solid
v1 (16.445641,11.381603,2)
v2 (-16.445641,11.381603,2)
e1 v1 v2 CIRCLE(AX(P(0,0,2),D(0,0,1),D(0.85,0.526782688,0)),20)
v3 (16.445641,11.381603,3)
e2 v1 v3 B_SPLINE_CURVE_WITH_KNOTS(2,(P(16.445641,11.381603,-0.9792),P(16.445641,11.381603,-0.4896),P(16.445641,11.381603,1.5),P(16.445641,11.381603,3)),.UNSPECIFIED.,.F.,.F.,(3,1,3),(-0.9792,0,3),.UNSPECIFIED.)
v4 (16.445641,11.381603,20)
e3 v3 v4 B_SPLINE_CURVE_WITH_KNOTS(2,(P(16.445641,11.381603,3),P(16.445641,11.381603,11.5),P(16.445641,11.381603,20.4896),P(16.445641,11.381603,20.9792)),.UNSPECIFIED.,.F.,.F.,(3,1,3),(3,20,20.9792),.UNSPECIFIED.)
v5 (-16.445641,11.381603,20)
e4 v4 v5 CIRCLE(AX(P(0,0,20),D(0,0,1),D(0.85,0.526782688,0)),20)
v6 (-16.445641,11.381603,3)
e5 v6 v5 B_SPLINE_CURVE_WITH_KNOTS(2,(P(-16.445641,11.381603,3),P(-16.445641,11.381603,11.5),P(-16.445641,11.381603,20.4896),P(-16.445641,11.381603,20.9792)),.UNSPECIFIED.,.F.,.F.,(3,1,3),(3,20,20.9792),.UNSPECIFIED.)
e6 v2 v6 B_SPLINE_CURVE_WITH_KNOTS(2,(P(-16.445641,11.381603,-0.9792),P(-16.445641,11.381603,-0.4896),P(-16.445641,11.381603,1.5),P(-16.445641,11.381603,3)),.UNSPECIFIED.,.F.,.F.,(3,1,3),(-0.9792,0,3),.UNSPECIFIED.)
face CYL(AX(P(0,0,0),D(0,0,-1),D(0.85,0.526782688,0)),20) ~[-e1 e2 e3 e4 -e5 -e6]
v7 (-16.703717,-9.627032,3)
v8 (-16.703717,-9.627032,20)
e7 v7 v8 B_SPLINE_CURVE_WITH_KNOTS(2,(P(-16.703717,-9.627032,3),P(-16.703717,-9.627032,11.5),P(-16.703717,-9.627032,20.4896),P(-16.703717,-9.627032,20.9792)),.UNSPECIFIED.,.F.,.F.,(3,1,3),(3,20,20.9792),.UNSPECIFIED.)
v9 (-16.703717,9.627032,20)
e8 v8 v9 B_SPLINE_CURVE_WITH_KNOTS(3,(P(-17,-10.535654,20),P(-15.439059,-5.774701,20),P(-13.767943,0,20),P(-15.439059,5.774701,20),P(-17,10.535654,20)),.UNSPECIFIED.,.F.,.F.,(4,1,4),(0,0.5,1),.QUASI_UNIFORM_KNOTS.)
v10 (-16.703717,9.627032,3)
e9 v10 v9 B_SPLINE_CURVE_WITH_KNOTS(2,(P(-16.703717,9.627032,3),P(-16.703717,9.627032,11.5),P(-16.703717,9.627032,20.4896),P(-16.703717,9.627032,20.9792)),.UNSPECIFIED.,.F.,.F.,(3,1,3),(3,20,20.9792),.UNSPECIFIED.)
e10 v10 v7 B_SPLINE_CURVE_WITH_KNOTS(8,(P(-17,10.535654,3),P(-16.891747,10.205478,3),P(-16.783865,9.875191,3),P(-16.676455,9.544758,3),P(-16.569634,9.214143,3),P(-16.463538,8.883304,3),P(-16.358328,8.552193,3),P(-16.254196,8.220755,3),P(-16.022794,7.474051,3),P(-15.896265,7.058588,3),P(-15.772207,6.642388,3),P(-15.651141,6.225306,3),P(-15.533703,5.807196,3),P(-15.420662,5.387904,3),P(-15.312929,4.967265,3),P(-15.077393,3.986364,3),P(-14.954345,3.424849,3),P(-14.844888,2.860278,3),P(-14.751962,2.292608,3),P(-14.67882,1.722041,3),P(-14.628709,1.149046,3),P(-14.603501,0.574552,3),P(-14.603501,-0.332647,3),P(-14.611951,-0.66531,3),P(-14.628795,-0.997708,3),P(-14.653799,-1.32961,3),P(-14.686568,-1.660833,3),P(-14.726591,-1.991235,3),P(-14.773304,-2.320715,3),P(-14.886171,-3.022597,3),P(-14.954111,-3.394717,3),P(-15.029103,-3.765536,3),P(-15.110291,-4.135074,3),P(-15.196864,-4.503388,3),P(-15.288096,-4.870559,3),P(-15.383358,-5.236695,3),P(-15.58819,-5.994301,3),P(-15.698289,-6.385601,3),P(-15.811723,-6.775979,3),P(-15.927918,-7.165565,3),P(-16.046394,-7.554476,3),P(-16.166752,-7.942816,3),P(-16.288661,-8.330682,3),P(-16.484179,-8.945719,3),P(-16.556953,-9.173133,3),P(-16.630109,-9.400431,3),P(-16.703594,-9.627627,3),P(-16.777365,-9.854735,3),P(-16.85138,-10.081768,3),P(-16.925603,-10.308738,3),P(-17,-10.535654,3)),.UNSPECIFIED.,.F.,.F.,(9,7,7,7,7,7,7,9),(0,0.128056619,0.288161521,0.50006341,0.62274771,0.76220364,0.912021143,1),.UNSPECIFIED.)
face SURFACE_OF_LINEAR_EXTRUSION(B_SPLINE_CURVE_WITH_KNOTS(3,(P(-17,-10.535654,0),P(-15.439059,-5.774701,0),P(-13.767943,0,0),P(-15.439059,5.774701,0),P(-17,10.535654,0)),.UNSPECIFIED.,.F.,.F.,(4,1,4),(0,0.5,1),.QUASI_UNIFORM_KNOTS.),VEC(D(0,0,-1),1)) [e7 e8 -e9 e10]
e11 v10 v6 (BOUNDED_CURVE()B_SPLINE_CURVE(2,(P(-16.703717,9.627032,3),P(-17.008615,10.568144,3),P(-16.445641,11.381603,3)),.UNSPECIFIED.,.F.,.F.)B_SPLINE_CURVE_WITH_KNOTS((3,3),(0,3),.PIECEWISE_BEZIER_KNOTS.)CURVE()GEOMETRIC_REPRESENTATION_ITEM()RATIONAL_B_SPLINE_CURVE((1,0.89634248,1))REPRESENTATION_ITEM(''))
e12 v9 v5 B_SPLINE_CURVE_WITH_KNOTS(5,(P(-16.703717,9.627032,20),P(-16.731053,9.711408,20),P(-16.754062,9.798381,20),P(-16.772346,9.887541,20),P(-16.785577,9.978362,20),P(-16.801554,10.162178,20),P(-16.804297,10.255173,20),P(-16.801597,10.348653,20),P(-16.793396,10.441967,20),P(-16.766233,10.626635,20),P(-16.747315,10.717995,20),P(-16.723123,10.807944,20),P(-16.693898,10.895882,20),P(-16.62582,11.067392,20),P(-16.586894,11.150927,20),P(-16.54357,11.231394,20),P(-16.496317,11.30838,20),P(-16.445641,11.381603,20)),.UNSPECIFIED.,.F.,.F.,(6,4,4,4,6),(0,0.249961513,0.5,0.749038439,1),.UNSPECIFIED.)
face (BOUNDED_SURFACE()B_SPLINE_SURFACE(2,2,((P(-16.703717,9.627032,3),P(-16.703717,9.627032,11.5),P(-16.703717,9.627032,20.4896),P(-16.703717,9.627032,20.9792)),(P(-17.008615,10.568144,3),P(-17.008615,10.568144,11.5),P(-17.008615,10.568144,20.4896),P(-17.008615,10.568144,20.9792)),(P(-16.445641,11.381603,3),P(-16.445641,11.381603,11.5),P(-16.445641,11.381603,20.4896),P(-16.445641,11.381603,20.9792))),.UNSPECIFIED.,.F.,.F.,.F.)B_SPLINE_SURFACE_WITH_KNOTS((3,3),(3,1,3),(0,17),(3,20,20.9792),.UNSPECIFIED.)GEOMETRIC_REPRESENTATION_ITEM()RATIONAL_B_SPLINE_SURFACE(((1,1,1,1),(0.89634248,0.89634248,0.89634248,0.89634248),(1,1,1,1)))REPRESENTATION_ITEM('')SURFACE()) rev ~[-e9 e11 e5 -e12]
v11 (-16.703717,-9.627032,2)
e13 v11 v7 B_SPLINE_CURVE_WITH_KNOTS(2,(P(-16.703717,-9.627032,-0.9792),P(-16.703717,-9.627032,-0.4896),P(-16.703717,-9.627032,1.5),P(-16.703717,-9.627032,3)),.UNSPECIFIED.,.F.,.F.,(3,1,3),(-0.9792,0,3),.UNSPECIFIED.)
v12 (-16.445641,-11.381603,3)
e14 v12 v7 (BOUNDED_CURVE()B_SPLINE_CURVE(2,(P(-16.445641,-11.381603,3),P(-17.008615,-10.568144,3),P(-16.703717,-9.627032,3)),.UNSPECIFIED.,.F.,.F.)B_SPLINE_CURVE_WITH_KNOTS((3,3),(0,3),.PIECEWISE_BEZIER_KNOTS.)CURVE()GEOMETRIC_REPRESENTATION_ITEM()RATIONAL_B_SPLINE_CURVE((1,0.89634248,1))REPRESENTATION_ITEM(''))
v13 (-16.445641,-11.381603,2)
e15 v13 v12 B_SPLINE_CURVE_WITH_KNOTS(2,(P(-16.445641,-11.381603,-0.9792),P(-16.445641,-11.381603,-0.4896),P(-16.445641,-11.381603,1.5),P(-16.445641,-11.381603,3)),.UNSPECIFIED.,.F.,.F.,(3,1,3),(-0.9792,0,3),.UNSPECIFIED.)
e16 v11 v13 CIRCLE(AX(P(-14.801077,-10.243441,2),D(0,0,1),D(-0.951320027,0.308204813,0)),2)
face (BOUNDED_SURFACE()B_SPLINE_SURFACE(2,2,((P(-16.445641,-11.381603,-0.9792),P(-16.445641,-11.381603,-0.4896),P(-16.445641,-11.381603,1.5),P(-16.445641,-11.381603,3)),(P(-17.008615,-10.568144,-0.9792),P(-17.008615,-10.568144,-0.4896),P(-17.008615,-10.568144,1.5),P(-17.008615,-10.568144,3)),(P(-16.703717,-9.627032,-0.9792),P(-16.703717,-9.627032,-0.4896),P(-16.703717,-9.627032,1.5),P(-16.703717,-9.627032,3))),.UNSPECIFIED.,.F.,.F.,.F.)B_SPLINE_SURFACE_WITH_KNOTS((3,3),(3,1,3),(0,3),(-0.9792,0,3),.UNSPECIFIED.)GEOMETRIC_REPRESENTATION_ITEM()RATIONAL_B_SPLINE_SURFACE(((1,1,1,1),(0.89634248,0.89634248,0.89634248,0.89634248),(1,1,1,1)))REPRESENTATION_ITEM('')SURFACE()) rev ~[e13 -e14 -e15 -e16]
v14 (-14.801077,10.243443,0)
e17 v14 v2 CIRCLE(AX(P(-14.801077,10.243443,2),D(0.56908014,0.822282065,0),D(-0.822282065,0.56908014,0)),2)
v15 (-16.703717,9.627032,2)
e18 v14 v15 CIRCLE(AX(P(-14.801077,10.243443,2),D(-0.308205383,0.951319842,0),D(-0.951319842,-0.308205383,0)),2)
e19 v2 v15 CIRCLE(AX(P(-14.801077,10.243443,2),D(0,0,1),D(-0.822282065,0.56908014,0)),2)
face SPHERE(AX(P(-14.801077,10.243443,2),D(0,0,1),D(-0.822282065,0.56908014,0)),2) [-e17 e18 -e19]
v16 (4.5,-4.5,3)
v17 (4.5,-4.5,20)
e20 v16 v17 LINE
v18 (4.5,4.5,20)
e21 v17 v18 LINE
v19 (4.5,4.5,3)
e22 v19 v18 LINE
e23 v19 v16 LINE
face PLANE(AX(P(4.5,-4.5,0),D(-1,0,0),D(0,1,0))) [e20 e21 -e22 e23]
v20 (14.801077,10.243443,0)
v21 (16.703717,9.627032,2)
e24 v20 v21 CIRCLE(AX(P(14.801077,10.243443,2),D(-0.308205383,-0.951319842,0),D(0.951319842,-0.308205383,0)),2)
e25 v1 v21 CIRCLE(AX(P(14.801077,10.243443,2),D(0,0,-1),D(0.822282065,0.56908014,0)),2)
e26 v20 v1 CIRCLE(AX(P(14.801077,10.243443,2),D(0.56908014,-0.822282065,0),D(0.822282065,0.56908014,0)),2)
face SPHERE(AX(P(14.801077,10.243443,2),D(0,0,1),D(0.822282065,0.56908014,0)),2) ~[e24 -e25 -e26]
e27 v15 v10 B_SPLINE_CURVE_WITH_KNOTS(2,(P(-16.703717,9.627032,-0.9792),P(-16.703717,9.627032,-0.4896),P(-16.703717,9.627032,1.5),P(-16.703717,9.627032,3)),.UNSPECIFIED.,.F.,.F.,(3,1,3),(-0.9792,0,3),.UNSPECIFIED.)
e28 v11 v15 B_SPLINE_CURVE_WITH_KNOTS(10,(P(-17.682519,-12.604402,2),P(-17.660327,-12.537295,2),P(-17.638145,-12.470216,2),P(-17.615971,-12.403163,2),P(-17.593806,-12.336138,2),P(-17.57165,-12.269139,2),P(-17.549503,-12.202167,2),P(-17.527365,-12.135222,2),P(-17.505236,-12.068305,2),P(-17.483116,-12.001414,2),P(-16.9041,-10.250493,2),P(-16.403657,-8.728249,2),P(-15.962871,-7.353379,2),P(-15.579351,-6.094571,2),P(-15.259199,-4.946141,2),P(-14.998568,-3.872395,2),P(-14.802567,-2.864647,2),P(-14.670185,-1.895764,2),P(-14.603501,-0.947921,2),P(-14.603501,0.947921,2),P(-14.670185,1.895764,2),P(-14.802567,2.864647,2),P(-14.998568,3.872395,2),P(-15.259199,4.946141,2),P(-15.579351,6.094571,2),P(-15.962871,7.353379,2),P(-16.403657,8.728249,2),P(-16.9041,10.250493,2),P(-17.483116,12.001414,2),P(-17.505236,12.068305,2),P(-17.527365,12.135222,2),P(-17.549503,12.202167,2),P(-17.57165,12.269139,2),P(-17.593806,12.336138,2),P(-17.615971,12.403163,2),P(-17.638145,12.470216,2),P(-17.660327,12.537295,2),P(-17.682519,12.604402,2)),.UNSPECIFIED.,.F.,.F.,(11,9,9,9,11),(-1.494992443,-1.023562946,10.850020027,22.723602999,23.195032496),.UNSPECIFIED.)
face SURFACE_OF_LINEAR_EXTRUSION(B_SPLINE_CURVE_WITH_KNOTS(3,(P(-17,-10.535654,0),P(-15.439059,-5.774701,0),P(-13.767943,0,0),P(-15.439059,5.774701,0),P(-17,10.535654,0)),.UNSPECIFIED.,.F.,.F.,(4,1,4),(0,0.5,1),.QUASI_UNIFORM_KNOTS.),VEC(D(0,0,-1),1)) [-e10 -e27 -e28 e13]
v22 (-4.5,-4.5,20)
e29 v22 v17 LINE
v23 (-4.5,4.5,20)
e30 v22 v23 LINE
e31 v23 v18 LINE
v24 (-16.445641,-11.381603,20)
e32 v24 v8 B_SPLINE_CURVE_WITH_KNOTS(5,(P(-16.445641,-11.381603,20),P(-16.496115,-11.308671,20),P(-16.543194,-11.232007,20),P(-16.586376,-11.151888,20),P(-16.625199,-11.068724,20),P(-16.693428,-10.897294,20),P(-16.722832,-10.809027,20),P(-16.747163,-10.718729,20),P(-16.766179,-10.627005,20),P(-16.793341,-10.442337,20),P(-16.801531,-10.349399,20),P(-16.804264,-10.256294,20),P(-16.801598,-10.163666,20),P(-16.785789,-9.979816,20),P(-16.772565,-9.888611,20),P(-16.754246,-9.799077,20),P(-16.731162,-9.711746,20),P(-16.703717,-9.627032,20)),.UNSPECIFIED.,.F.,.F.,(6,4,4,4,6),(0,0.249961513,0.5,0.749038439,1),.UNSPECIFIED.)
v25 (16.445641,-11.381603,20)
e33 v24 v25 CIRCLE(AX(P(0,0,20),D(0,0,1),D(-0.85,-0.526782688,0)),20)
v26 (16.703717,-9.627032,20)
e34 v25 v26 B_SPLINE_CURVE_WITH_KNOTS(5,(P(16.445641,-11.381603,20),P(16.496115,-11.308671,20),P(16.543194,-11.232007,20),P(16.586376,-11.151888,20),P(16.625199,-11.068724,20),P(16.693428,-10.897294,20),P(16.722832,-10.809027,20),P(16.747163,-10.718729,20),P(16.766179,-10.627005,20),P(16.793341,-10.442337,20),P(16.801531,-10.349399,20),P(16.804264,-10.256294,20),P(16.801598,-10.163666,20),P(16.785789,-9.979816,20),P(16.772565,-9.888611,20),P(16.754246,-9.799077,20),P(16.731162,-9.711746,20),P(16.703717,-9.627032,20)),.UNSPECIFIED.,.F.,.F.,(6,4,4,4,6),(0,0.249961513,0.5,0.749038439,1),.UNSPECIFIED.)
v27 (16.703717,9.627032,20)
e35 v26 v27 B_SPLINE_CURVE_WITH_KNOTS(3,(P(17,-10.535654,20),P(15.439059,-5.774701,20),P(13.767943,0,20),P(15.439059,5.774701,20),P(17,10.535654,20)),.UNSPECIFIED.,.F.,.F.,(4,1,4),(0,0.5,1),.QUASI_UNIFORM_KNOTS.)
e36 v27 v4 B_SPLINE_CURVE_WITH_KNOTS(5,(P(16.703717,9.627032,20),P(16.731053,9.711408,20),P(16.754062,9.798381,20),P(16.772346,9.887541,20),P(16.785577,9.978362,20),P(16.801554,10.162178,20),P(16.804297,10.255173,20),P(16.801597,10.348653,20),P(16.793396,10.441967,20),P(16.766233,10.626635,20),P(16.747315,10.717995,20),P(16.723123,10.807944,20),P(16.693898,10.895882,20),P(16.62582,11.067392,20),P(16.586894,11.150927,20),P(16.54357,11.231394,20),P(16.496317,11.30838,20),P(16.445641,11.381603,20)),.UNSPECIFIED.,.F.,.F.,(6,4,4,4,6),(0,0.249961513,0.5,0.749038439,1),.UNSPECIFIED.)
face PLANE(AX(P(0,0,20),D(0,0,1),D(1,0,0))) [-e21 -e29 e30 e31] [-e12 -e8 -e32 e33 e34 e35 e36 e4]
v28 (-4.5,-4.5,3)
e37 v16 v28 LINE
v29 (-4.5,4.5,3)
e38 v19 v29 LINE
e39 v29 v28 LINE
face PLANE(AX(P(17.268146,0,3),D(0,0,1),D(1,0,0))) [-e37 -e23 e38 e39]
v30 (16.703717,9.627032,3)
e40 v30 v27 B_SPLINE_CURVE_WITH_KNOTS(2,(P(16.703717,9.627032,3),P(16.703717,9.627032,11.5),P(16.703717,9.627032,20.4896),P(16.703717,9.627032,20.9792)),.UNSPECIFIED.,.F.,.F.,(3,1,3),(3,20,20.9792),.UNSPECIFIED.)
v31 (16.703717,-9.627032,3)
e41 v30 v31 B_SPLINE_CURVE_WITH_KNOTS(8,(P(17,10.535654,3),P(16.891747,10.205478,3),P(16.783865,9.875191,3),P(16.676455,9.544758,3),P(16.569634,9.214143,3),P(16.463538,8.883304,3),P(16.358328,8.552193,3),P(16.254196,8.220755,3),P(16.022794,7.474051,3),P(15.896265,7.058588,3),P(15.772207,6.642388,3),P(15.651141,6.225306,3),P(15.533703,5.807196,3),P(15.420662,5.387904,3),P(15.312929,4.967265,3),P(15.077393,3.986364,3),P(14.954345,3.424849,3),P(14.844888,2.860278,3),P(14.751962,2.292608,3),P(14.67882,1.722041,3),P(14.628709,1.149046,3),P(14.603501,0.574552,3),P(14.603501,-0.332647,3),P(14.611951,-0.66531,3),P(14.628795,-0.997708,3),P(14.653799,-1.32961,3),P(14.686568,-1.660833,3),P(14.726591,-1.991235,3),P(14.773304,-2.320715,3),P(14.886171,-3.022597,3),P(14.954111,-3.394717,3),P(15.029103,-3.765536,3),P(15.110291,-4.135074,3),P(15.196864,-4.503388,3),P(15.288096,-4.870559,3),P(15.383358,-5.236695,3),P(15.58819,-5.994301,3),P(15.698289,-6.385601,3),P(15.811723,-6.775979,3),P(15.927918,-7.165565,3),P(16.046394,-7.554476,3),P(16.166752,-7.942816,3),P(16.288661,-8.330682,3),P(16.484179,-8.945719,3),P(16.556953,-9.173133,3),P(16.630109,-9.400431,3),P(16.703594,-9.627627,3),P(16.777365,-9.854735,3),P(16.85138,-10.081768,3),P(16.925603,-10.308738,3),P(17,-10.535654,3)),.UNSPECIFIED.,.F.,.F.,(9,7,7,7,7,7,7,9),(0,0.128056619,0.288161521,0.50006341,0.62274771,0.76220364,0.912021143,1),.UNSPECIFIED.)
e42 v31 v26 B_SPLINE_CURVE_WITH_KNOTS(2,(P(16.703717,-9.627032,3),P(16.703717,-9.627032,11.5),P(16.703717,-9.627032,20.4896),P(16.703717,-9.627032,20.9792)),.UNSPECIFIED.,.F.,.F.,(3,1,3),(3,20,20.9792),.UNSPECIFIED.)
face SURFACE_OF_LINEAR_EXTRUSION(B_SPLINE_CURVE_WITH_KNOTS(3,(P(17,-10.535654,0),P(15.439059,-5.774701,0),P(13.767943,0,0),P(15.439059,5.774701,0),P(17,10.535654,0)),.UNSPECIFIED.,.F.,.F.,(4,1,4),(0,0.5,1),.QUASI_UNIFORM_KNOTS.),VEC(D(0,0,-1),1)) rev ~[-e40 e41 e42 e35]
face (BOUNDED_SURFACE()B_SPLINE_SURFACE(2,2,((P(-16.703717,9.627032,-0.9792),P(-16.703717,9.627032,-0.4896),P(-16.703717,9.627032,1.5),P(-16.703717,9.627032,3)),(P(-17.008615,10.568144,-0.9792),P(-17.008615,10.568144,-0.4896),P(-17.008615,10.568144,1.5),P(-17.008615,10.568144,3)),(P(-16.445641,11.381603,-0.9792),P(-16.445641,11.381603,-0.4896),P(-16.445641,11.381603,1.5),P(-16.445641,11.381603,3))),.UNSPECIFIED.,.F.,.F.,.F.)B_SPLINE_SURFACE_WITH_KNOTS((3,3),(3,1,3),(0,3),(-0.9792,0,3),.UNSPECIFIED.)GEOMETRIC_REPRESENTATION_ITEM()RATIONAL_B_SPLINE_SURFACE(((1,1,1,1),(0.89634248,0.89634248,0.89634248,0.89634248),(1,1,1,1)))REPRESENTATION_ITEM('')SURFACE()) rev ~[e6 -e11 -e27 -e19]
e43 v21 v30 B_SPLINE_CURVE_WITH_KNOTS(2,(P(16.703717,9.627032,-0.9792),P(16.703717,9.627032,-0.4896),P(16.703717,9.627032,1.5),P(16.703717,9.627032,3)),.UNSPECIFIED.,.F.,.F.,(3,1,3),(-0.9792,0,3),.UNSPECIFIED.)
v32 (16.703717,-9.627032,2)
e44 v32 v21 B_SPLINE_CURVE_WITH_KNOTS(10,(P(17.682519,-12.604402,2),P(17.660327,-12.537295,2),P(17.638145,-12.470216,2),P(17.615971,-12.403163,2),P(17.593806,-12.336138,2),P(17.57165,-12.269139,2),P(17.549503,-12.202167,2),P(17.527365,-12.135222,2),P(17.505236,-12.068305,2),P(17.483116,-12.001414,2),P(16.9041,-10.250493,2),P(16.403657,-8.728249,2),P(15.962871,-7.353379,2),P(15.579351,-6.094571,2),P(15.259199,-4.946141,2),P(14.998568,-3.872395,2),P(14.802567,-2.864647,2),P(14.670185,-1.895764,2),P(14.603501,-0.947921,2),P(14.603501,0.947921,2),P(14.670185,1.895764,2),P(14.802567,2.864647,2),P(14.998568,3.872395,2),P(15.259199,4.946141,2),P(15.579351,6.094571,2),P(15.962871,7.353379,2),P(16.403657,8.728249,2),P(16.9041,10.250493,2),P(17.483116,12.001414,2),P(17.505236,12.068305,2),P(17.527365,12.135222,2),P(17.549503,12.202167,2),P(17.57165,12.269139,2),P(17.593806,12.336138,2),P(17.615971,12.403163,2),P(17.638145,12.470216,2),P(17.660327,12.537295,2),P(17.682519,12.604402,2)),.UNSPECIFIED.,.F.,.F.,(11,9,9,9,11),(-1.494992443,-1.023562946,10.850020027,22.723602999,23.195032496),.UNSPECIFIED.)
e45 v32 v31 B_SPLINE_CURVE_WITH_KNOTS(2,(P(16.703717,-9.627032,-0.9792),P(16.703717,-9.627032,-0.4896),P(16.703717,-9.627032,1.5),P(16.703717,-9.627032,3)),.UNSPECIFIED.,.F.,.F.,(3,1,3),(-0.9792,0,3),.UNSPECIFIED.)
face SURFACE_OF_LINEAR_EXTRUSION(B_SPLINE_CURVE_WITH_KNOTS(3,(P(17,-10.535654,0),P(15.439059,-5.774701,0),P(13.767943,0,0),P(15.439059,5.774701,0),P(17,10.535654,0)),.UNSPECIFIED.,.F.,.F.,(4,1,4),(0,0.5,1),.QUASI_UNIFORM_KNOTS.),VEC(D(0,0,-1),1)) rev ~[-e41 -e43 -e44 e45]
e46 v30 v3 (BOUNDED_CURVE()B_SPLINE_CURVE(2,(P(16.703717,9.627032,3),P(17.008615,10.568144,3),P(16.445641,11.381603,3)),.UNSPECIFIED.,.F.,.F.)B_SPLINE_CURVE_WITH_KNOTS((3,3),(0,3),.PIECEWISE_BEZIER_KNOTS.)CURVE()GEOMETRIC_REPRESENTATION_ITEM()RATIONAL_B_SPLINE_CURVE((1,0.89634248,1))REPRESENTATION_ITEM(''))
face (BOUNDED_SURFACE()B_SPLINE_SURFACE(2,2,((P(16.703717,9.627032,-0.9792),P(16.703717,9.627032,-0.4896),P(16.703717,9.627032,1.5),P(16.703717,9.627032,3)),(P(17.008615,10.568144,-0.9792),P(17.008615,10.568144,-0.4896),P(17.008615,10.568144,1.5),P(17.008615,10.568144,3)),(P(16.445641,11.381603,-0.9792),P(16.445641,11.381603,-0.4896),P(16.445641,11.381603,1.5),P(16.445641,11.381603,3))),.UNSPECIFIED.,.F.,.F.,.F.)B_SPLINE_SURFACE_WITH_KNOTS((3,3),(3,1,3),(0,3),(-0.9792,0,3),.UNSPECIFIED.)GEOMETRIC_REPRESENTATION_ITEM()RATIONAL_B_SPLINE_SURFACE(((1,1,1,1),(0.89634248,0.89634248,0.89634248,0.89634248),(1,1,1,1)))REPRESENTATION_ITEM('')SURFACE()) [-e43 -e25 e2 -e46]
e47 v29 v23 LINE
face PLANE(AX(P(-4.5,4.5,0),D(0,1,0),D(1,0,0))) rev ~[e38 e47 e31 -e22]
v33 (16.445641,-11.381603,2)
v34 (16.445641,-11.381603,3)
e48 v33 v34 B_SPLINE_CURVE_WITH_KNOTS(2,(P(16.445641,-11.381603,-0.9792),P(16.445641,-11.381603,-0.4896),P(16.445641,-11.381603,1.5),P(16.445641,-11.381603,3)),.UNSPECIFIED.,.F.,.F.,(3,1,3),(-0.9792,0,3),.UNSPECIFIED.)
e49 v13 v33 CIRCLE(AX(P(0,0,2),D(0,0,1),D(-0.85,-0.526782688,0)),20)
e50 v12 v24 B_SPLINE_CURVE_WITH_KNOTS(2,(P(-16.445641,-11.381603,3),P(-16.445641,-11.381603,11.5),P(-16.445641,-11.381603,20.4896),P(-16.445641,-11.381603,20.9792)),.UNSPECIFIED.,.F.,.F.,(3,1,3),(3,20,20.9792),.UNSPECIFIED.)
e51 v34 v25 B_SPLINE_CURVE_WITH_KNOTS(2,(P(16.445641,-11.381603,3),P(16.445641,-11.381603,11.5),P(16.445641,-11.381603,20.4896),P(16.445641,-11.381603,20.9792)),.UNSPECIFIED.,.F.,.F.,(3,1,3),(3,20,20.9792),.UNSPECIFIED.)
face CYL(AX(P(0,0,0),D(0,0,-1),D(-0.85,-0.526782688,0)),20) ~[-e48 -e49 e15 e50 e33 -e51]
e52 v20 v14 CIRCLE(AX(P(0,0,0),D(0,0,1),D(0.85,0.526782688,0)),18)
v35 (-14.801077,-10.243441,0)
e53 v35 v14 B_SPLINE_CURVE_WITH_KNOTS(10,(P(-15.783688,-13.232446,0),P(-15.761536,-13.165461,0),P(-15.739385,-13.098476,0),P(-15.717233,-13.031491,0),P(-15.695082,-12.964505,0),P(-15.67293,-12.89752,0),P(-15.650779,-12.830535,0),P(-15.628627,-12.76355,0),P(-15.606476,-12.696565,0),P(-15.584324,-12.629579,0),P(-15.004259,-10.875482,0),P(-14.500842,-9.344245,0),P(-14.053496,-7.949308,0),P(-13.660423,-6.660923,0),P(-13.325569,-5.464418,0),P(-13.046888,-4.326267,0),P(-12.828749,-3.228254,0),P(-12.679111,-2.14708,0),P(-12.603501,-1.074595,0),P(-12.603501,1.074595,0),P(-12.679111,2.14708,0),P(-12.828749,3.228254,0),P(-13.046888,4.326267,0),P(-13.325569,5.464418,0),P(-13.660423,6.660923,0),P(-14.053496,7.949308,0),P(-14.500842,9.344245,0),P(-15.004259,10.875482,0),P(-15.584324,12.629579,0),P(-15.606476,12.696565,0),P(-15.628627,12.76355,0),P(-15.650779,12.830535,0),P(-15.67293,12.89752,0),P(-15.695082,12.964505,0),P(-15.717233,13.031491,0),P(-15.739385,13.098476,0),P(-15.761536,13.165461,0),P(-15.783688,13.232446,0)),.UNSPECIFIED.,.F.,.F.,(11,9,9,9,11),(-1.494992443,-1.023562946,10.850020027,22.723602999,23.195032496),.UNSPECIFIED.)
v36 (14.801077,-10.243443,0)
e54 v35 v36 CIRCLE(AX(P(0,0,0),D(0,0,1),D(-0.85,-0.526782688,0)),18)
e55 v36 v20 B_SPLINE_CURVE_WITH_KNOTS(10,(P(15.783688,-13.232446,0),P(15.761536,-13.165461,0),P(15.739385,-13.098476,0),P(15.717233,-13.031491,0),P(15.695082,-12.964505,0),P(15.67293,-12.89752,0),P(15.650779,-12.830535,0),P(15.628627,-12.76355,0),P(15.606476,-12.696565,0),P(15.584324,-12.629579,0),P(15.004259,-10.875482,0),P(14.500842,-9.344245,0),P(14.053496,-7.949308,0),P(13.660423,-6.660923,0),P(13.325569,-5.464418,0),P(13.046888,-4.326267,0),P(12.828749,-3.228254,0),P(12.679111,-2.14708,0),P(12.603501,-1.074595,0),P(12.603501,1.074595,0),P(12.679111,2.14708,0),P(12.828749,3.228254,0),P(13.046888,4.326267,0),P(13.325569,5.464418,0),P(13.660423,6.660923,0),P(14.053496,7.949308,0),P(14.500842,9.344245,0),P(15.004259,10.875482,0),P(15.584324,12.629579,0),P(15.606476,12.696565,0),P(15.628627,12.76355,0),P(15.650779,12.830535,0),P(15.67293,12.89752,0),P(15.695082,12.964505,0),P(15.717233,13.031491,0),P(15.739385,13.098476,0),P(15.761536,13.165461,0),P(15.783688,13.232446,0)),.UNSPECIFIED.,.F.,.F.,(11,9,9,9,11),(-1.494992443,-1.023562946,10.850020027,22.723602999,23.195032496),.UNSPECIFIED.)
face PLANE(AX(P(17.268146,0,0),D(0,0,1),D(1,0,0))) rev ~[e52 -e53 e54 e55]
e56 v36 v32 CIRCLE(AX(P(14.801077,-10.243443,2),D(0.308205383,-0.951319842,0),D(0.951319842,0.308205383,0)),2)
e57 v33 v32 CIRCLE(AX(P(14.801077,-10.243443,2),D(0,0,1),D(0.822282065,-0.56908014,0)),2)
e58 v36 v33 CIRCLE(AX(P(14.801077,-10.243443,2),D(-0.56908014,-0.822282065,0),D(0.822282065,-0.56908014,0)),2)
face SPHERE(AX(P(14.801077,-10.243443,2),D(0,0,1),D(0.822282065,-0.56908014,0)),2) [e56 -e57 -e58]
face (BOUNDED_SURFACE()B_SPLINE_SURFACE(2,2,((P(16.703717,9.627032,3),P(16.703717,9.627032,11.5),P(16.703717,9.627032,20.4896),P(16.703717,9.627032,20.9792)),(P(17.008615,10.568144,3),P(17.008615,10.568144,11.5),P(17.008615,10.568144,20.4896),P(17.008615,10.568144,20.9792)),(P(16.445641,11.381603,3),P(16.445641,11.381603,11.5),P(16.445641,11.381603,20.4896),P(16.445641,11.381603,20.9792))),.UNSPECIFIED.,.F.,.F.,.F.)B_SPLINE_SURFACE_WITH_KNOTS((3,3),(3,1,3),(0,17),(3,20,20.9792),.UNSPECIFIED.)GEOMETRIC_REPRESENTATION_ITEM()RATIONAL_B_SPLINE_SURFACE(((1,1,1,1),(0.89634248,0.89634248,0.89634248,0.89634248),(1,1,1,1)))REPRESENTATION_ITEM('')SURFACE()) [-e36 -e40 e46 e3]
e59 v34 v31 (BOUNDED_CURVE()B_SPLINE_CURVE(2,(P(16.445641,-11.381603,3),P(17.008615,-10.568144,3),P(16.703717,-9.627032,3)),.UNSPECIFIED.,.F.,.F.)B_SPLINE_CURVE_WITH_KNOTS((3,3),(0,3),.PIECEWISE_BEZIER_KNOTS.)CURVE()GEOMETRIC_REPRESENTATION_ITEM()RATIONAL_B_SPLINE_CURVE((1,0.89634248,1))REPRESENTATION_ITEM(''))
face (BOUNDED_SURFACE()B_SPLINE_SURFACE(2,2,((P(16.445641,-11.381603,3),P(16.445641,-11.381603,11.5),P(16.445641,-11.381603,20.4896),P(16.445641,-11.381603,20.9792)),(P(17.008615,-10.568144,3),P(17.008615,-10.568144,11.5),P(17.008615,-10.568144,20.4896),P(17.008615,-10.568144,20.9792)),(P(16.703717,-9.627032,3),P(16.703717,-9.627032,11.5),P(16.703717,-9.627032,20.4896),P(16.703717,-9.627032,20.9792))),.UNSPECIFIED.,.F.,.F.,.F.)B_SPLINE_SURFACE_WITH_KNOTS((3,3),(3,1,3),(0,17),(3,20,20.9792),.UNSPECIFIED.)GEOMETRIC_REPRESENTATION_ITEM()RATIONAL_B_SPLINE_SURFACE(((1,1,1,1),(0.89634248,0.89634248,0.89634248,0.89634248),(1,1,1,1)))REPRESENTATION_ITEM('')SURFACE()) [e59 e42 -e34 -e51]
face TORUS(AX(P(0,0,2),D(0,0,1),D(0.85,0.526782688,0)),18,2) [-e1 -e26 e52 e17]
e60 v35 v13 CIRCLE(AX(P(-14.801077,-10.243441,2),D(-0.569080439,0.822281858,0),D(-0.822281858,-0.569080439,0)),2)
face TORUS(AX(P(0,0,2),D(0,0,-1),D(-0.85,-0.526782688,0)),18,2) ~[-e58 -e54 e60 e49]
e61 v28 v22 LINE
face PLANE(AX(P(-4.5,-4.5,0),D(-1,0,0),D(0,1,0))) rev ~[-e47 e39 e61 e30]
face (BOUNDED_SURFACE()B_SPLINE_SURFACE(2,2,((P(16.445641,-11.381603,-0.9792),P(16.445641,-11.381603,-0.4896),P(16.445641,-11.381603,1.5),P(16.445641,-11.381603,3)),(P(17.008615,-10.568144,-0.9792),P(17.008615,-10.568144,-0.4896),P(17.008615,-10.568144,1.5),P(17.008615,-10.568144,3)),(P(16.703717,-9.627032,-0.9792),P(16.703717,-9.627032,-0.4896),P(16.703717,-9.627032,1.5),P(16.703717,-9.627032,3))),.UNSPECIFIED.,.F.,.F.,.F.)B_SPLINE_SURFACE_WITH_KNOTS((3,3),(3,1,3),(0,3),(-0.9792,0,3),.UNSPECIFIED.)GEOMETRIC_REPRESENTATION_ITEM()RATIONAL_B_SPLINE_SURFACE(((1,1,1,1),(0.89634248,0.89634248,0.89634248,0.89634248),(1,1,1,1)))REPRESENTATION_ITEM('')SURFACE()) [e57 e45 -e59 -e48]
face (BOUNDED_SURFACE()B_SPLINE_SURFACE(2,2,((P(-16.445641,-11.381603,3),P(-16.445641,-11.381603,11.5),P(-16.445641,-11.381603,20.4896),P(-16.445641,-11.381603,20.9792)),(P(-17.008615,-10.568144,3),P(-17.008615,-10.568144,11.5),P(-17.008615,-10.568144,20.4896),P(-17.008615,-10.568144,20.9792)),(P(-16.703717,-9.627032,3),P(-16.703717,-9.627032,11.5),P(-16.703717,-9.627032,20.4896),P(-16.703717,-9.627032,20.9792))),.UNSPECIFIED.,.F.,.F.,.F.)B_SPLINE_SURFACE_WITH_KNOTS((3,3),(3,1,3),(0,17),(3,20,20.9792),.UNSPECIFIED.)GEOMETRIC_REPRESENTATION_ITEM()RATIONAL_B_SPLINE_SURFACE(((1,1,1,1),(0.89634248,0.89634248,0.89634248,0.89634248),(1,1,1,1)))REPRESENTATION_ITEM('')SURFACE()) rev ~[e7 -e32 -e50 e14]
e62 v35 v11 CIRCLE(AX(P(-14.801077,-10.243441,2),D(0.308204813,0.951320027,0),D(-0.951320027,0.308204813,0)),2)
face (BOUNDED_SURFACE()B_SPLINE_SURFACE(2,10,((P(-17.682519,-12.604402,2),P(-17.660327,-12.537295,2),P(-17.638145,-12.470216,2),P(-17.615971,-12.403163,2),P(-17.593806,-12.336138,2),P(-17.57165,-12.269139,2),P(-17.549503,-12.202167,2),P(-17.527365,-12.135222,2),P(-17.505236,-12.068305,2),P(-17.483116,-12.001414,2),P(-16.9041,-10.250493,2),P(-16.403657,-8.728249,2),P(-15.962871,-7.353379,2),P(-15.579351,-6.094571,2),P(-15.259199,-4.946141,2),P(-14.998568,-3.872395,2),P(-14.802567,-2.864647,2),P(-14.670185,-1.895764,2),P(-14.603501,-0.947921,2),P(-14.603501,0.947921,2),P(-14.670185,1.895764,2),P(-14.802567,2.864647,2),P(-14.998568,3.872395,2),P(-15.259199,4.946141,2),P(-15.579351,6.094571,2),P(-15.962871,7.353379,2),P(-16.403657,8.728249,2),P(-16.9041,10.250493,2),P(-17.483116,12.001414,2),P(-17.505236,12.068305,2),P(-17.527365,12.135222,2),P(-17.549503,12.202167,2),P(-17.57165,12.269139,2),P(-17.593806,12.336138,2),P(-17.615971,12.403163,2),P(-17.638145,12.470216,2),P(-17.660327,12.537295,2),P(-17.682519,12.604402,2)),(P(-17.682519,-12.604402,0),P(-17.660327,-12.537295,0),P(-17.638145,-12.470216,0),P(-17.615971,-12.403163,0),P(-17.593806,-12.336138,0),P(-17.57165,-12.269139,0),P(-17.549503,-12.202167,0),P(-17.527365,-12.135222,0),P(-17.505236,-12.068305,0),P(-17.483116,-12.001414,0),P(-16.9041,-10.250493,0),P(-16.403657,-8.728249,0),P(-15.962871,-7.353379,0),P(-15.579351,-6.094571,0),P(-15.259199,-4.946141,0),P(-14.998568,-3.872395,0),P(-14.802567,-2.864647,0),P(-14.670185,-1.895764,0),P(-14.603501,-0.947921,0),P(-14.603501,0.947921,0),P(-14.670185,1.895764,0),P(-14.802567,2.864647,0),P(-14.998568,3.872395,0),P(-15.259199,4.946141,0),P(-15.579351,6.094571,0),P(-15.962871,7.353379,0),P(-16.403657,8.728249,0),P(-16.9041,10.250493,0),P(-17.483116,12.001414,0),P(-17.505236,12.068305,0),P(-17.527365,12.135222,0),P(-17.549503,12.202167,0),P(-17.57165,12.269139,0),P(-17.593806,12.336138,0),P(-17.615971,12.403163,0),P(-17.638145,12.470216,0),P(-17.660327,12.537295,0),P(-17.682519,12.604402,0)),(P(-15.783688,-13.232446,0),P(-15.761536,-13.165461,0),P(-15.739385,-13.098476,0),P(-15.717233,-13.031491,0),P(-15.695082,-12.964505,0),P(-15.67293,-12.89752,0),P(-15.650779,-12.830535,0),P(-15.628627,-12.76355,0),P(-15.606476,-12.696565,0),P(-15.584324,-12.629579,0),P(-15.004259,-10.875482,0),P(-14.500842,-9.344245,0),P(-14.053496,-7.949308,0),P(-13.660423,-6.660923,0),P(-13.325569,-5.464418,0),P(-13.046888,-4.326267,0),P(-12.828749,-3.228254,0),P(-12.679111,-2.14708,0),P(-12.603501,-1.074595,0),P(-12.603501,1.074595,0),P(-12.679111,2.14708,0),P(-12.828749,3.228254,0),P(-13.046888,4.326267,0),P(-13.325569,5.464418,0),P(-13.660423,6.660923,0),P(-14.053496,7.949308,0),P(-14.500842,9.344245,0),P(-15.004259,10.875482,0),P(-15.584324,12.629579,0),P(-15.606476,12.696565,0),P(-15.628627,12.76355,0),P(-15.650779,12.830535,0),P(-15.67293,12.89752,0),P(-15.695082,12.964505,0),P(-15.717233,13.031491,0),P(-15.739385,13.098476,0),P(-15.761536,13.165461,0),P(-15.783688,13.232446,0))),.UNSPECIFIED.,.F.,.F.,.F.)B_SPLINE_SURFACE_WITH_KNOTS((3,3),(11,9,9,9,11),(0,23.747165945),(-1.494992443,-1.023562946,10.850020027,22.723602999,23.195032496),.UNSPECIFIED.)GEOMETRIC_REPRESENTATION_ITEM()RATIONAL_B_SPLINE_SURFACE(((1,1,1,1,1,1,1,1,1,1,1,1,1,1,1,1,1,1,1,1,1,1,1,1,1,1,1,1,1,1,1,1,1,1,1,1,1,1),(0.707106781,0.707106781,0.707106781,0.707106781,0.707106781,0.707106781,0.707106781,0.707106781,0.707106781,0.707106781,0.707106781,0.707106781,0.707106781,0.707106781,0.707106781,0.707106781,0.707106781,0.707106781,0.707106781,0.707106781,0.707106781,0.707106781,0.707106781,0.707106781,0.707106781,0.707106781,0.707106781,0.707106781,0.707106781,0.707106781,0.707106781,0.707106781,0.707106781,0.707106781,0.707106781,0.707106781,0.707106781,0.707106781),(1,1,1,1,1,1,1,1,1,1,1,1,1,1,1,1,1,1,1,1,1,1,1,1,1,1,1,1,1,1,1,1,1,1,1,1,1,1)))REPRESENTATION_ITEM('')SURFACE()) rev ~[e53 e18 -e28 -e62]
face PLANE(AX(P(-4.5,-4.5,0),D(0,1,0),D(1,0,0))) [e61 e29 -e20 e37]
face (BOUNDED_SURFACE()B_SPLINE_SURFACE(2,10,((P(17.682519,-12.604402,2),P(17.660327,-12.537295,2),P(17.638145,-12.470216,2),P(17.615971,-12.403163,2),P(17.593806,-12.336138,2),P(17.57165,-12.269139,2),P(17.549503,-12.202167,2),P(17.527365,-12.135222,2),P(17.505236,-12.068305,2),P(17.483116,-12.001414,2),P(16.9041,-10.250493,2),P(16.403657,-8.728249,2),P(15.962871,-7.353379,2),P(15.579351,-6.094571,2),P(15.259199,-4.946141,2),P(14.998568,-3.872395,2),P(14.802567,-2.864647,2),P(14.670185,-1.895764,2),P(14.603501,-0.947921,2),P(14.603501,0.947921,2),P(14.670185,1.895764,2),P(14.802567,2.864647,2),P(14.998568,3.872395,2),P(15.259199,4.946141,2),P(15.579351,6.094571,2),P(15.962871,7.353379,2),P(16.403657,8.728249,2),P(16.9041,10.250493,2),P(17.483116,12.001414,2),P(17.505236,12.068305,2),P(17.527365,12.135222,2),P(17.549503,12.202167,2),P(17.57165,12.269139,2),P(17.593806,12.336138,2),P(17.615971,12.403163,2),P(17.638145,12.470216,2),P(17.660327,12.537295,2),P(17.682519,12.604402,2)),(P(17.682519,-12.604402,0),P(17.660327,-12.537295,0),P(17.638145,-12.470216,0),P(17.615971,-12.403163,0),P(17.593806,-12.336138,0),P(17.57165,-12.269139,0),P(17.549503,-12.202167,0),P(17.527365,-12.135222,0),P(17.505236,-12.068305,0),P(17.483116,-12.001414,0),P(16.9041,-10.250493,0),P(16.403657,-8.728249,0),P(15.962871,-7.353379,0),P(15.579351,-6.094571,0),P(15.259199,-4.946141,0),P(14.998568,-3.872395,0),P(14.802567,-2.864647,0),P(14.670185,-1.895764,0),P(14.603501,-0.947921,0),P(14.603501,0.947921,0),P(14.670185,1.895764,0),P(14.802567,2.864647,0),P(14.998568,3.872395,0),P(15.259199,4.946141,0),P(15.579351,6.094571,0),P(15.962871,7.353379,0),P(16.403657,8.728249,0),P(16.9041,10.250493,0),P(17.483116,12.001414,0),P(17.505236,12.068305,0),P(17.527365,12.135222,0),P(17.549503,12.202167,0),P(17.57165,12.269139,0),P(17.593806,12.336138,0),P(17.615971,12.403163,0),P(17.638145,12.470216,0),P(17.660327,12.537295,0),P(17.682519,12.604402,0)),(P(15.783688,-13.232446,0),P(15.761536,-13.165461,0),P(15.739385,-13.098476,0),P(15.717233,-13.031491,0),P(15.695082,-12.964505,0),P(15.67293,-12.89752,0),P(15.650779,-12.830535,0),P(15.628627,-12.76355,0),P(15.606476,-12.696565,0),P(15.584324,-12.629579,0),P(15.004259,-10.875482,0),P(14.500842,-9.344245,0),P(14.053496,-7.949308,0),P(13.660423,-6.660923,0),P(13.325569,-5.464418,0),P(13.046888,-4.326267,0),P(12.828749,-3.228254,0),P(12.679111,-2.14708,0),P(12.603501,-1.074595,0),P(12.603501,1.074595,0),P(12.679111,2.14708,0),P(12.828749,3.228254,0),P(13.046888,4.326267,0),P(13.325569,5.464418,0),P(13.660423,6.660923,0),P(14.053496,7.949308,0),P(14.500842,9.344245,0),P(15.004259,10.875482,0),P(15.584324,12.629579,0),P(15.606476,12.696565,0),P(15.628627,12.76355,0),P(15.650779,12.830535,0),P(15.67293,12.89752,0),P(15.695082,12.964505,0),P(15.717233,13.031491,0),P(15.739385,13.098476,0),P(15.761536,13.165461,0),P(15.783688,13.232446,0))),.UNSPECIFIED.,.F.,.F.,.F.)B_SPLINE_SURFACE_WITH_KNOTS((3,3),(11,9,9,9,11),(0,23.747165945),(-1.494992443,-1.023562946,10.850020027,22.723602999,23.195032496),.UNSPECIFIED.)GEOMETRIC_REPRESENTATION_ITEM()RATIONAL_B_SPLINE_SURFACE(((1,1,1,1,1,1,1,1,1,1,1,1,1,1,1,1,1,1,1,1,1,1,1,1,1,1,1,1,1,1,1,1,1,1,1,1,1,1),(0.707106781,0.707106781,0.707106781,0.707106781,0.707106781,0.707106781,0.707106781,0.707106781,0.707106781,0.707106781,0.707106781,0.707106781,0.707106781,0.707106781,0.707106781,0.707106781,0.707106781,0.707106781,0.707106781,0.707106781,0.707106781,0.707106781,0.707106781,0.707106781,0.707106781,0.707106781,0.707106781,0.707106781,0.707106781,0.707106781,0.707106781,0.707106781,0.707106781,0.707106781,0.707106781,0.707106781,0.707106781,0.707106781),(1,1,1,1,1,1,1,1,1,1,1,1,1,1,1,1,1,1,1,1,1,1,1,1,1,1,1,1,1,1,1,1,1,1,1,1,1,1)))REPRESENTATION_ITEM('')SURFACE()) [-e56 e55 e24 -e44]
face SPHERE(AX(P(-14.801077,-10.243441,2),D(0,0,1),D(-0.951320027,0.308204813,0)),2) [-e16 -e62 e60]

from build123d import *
from build123d import SkipClean  # not in build123d's __all__

# Parameters (mm, degrees)
F0_W     = 9
F0_H     = 9
F1_DEPTH = 3
F2_DEPTH = 20
F3_DEPTH = 25
F4_R     = 2


with BuildPart() as f1:
    # F0 (on Top) → F1 (new body)
    with BuildSketch(Plane.XY):
        with BuildLine():
            ThreePointArc((17, -10.5356537529), (19.2353840617, -5.4772255751), (20, 0))
            ThreePointArc((20, 0), (19.2353840617, 5.4772255751), (17, 10.5356537529))
            add(Edge.make_bspline(
                [(17, -10.5356537529), (15.4390588775, -5.7747014672), (13.767943494, 0), (15.4390588775, 5.7747014672), (17, 10.5356537529)],
                knots=[0, 0, 0, 0, 0.5, 1, 1, 1, 1], degree=3))
        make_face()
        with BuildLine():
            add(Edge.make_bspline(
                [(17, -10.5356537529), (15.4390588775, -5.7747014672), (13.767943494, 0), (15.4390588775, 5.7747014672), (17, 10.5356537529)],
                knots=[0, 0, 0, 0, 0.5, 1, 1, 1, 1], degree=3))
            ThreePointArc((17, 10.5356537529), (0, 20), (-17, 10.5356537529))
            add(Edge.make_bspline(
                [(-17, -10.5356537529), (-15.4390588775, -5.7747014672), (-13.767943494, 0), (-15.4390588775, 5.7747014672), (-17, 10.5356537529)],
                knots=[0, 0, 0, 0, 0.5, 1, 1, 1, 1], degree=3))
            ThreePointArc((-17, -10.5356537529), (0, -20), (17, -10.5356537529))
        make_face()
        Rectangle(F0_W, F0_H, mode=Mode.SUBTRACT)
        with BuildLine():
            add(Edge.make_bspline(
                [(-17, -10.5356537529), (-15.4390588775, -5.7747014672), (-13.767943494, 0), (-15.4390588775, 5.7747014672), (-17, 10.5356537529)],
                knots=[0, 0, 0, 0, 0.5, 1, 1, 1, 1], degree=3))
            ThreePointArc((-17, 10.5356537529), (-20, 0), (-17, -10.5356537529))
        make_face()
        Rectangle(F0_W, F0_H)
    extrude(amount=F1_DEPTH)

    # F0 (on Top) → F2 (join)
    with BuildSketch(Plane.XY):
        with BuildLine():
            add(Edge.make_bspline(
                [(17, -10.5356537529), (15.4390588775, -5.7747014672), (13.767943494, 0), (15.4390588775, 5.7747014672), (17, 10.5356537529)],
                knots=[0, 0, 0, 0, 0.5, 1, 1, 1, 1], degree=3))
            ThreePointArc((17, 10.5356537529), (0, 20), (-17, 10.5356537529))
            add(Edge.make_bspline(
                [(-17, -10.5356537529), (-15.4390588775, -5.7747014672), (-13.767943494, 0), (-15.4390588775, 5.7747014672), (-17, 10.5356537529)],
                knots=[0, 0, 0, 0, 0.5, 1, 1, 1, 1], degree=3))
            ThreePointArc((-17, -10.5356537529), (0, -20), (17, -10.5356537529))
        make_face()
        Rectangle(F0_W, F0_H, mode=Mode.SUBTRACT)
    with SkipClean():  # cleaning this boolean's faces spoils the solid; the shape is the same uncleaned
        extrude(amount=F2_DEPTH)

    # F0 (on Top) → F3 (cut)
    with BuildSketch(Plane.XY):
        with BuildLine():
            add(Edge.make_bspline(
                [(-17, -10.5356537529), (-15.4390588775, -5.7747014672), (-13.767943494, 0), (-15.4390588775, 5.7747014672), (-17, 10.5356537529)],
                knots=[0, 0, 0, 0, 0.5, 1, 1, 1, 1], degree=3))
            ThreePointArc((-17, 10.5356537529), (-20, 0), (-17, -10.5356537529))
        make_face()
        with BuildLine():
            ThreePointArc((17, -10.5356537529), (19.2353840617, -5.4772255751), (20, 0))
            ThreePointArc((20, 0), (19.2353840617, 5.4772255751), (17, 10.5356537529))
            add(Edge.make_bspline(
                [(17, -10.5356537529), (15.4390588775, -5.7747014672), (13.767943494, 0), (15.4390588775, 5.7747014672), (17, 10.5356537529)],
                knots=[0, 0, 0, 0, 0.5, 1, 1, 1, 1], degree=3))
        make_face()
    extrude(amount=F3_DEPTH, mode=Mode.SUBTRACT)

    # F4
    f4_edges = [f1.edges().sort_by_distance(p)[0] for p in [
        (0, 20, 0),
        (-14.603501, 0, 0),
        (0, -20, 0),
        (14.603501, 0, 0),
        (-17, 10.535654, 1.5),
        (-17, 10.535654, 11.5),
        (-17, -10.535654, 1.5),
        (-17, -10.535654, 11.5),
        (17, 10.535654, 1.5),
        (17, 10.535654, 11.5),
        (17, -10.535654, 11.5),
        (17, -10.535654, 1.5),
    ]]
    fillet(f4_edges, radius=F4_R)


solid = f1.part
